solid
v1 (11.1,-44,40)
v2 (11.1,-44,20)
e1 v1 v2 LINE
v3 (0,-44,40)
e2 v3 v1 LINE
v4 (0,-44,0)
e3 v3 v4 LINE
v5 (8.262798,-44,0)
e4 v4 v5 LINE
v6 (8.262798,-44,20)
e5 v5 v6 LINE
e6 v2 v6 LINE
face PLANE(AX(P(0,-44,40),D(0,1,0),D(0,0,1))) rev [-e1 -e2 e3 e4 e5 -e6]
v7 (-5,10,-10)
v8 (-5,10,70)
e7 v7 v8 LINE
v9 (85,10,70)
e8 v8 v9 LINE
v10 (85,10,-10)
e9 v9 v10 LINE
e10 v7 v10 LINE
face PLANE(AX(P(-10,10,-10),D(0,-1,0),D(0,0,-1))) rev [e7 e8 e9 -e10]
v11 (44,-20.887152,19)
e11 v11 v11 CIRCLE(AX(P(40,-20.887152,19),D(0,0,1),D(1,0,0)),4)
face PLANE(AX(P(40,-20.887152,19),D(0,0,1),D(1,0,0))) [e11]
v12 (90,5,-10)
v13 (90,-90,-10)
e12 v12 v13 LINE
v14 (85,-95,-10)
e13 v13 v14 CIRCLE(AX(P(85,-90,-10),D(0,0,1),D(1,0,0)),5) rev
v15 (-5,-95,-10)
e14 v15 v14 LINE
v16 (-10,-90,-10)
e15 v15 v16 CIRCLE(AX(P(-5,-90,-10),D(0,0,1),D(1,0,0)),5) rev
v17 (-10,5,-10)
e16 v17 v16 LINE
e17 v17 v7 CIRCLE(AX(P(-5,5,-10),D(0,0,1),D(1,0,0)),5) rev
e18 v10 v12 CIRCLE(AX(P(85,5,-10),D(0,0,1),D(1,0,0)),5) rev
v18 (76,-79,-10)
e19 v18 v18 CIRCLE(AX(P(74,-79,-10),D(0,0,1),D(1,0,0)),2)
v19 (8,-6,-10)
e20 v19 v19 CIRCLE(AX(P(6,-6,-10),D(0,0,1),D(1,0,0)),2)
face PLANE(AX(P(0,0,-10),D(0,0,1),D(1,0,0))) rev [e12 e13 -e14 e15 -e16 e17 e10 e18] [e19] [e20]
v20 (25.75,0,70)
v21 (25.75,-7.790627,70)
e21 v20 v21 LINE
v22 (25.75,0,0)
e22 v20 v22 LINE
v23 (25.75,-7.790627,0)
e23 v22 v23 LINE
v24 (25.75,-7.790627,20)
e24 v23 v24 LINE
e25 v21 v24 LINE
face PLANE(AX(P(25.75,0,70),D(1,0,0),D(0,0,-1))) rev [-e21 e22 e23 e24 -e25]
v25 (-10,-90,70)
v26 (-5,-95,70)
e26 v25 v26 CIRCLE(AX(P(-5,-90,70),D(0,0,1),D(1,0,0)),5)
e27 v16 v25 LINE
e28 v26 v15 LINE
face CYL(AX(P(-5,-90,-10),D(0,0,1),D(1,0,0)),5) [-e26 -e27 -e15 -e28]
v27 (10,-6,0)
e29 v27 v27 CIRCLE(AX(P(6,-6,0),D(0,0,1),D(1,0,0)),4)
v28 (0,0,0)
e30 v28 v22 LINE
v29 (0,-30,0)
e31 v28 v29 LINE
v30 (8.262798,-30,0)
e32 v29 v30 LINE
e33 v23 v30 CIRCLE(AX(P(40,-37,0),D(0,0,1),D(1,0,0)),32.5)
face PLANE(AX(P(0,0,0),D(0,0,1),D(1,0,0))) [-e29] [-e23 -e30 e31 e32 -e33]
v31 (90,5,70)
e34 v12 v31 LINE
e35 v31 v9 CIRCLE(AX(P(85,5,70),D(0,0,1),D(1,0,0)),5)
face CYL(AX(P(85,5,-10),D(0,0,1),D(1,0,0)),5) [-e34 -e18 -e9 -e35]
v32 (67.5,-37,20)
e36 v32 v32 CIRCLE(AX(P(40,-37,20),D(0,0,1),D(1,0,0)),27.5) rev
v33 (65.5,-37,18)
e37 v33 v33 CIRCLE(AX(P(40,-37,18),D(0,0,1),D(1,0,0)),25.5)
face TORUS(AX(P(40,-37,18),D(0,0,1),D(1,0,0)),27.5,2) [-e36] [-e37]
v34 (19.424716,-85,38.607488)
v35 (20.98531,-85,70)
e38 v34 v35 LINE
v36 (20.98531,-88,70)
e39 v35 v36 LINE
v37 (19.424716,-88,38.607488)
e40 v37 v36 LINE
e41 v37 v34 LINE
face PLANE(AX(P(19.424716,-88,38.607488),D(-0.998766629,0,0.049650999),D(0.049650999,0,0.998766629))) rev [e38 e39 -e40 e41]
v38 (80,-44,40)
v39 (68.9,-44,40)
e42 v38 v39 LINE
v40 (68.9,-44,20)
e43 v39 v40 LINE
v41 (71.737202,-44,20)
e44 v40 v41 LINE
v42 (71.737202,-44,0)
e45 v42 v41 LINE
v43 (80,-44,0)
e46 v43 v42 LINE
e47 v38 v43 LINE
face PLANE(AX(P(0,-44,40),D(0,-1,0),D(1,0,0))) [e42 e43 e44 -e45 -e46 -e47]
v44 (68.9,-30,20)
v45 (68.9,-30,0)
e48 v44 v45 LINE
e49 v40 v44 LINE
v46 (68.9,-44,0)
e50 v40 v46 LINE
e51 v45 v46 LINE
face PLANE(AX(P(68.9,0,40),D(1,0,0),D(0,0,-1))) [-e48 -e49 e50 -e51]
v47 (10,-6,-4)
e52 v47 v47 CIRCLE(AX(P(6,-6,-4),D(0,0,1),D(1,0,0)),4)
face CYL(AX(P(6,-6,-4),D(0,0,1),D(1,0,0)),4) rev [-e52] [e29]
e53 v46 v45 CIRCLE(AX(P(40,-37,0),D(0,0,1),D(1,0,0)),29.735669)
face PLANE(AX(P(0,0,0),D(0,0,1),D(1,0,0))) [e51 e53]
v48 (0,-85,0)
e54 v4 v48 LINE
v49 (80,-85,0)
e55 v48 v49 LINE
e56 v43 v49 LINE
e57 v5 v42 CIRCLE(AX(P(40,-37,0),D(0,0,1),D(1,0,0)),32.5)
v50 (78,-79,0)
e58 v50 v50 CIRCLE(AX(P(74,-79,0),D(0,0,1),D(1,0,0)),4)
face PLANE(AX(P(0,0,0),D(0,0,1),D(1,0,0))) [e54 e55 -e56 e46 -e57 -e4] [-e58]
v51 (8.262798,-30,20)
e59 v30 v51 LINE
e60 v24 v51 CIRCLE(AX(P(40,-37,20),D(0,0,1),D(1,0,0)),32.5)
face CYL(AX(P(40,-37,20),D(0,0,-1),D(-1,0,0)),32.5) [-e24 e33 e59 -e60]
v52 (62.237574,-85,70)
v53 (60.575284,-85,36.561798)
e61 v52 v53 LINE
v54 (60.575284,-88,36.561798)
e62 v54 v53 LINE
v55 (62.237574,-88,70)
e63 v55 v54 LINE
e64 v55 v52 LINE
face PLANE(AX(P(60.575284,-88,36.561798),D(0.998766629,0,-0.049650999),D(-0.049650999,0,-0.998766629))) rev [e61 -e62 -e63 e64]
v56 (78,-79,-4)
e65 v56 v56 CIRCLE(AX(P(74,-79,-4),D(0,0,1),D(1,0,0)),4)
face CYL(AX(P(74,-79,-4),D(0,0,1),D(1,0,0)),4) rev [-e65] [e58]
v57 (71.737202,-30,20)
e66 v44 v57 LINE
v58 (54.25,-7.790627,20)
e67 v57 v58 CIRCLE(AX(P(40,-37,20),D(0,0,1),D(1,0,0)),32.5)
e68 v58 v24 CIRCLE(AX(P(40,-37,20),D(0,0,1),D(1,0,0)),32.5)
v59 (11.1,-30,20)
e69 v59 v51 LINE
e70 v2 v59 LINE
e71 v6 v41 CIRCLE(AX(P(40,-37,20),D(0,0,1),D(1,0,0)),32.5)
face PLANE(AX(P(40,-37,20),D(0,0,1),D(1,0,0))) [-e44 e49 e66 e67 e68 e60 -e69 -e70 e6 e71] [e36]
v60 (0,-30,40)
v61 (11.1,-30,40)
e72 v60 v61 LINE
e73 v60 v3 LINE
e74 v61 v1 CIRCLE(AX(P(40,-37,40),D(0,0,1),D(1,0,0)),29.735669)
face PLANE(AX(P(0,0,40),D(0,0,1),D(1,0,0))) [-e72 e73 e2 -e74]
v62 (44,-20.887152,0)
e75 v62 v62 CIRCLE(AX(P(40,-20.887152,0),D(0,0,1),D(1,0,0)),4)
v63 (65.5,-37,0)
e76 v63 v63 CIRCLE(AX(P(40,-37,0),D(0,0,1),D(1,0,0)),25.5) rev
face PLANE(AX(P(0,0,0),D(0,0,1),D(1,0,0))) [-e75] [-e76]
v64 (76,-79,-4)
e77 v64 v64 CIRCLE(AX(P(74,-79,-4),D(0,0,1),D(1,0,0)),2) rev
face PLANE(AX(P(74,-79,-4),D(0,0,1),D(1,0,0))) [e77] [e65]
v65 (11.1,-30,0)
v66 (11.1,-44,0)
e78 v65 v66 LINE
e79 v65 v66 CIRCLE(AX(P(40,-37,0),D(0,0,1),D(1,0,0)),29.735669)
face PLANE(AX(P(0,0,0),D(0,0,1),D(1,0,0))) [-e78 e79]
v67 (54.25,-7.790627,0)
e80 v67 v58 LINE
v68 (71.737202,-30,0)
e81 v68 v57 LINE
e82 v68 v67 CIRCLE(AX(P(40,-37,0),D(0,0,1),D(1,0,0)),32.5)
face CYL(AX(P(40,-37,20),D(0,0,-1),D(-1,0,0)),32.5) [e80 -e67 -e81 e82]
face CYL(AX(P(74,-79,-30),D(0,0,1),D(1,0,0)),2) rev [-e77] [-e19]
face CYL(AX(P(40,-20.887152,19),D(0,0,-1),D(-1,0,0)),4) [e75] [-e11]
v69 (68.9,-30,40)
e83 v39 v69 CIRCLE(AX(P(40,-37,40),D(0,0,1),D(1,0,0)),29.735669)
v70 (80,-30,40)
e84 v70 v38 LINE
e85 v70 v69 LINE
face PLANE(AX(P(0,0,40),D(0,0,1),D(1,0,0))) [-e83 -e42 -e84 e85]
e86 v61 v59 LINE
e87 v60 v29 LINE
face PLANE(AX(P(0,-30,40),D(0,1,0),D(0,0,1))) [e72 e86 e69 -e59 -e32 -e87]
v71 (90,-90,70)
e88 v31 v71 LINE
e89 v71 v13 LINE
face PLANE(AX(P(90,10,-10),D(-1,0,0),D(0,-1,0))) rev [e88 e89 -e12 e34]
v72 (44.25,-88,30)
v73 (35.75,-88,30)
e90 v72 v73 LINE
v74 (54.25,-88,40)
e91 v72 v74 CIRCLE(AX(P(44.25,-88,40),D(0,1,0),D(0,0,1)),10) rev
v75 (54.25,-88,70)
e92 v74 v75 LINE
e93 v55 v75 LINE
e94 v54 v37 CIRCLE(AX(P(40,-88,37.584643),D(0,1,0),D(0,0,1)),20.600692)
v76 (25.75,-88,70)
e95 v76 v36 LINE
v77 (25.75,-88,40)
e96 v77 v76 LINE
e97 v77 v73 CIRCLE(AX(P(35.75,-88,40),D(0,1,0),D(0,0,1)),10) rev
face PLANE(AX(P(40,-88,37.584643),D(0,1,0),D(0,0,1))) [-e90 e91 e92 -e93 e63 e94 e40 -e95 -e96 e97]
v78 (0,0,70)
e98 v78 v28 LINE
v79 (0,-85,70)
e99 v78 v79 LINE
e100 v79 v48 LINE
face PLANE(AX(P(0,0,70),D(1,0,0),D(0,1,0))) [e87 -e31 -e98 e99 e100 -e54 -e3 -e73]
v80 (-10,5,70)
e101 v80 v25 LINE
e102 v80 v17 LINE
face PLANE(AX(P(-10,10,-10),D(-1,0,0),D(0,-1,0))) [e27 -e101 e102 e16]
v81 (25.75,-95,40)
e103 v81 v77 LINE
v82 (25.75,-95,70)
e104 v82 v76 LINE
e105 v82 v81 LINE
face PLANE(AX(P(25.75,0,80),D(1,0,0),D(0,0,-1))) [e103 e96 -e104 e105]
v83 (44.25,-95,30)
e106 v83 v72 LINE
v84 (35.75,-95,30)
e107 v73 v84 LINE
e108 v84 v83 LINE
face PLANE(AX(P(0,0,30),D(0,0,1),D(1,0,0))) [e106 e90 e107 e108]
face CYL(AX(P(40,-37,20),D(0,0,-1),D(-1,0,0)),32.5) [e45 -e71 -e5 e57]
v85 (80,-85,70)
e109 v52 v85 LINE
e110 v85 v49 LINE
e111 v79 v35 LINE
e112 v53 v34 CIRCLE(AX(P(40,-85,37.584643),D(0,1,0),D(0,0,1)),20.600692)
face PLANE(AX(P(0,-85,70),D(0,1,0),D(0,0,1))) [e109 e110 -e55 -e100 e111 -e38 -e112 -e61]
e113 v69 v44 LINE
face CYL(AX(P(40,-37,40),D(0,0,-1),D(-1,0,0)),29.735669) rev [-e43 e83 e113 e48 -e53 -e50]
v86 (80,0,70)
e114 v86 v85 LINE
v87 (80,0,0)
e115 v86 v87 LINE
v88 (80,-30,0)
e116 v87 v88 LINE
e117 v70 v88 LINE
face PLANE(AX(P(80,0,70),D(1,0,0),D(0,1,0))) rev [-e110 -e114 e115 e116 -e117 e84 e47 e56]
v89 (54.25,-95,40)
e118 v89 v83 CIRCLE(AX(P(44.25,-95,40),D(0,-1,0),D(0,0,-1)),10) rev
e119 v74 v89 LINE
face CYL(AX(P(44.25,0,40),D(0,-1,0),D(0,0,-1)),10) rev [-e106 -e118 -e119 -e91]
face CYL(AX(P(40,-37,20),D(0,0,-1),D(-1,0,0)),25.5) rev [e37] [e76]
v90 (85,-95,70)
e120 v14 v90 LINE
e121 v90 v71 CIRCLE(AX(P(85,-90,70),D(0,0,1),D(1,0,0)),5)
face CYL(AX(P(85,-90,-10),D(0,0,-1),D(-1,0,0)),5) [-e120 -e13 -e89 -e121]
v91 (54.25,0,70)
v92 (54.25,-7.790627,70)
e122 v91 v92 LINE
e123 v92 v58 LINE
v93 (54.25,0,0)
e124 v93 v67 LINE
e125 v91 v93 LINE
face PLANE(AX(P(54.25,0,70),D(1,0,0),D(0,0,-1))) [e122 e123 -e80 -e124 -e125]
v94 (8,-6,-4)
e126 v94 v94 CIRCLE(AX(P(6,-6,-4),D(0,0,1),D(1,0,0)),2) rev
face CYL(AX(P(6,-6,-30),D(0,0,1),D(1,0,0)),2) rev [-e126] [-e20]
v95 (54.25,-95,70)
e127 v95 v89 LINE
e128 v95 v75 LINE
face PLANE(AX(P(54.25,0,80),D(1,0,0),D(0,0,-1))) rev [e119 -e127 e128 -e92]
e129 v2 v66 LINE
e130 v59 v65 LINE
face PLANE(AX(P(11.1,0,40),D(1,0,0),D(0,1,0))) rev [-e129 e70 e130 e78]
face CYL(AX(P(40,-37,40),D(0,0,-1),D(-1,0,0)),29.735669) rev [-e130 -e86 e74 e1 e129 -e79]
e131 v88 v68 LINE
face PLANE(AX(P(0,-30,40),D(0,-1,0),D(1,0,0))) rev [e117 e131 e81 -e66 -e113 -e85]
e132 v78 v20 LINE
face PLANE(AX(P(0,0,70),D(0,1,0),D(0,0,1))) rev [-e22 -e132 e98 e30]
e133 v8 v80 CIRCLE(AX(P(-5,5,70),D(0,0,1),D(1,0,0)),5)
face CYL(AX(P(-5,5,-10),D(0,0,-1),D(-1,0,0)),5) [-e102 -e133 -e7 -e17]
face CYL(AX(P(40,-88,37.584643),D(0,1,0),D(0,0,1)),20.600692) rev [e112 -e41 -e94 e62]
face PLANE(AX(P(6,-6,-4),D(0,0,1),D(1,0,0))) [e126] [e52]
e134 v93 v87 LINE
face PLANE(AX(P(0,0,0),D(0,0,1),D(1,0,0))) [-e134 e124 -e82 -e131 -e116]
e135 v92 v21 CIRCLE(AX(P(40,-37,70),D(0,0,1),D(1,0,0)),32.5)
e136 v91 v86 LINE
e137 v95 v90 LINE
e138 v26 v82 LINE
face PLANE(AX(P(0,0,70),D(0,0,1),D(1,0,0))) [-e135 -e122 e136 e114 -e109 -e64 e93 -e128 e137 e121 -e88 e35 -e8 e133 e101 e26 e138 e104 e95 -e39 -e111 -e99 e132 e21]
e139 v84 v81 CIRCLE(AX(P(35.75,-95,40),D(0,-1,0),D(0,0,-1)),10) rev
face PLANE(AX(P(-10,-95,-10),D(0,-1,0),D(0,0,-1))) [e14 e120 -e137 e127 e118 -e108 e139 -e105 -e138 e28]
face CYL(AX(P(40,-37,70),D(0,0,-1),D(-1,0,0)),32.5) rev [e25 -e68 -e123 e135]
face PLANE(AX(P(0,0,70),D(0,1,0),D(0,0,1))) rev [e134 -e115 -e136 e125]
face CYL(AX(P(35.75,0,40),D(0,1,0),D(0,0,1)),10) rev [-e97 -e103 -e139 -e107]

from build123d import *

# Parameters (mm, degrees)
SKETCH1_W            = 100
SKETCH1_H            = 105
BOSS_EXTRUDE1_DEPTH  = 10
SKETCH1_3_W          = 100
SKETCH1_3_H          = 105
SKETCH1_3_W_2        = 80
SKETCH1_3_H_2        = 85
BOSS_EXTRUDE2_DEPTH  = 70
SKETCH1_6_W          = 28.5
SKETCH1_6_H          = 10
CUT_EXTRUDE1_DEPTH   = 80
SKETCH1_7_W          = 28.5
SKETCH1_7_H          = 10
BOSS_EXTRUDE4_DEPTH  = 30
SKETCH1_8_R          = 2
CUT_EXTRUDE2_DEPTH   = 30
SKETCH1_9_R          = 4
CUT_EXTRUDE3_DEPTH   = 4
SKETCH1_11_R         = 32.5
SKETCH1_11_R_2       = 25.5
BOSS_EXTRUDE6_DEPTH  = 20
FILLET1_R            = 10
SKETCH1_12_R         = 4
BOSS_EXTRUDE7_DEPTH  = 19
BOSS_EXTRUDE13_DEPTH = 70
BOSS_EXTRUDE17_DEPTH = 40
CUT_EXTRUDE4_DEPTH   = 40
CUT_EXTRUDE5_DEPTH   = 3
FILLET2_R            = 5
FILLET3_R            = 2


with BuildPart() as part:
    # Sketch1 → Boss-Extrude1 (new body)
    with BuildSketch(Plane.XY):
        with Locations((40, -42.5)):
            Rectangle(SKETCH1_W, SKETCH1_H)
    extrude(amount=-BOSS_EXTRUDE1_DEPTH)

    # Sketch1<3> → Boss-Extrude2 (add)
    with BuildSketch(Plane.XY):
        with Locations((40, -42.5)):
            Rectangle(SKETCH1_3_W, SKETCH1_3_H)
        with Locations((40, -42.5)):
            Rectangle(SKETCH1_3_W_2, SKETCH1_3_H_2, mode=Mode.SUBTRACT)
    extrude(amount=BOSS_EXTRUDE2_DEPTH)

    # Sketch1<6> → Cut-Extrude1 (cut)
    with BuildSketch(Plane.XY):
        with Locations((40, -90)):
            Rectangle(SKETCH1_6_W, SKETCH1_6_H)
    extrude(amount=CUT_EXTRUDE1_DEPTH, mode=Mode.SUBTRACT)

    # Sketch1<7> → Boss-Extrude4 (add)
    with BuildSketch(Plane.XY):
        with Locations((40, -90)):
            Rectangle(SKETCH1_7_W, SKETCH1_7_H)
    extrude(amount=BOSS_EXTRUDE4_DEPTH)

    # Sketch1<8> → Cut-Extrude2 (cut)
    with BuildSketch(Plane.XY):
        with Locations((6, -6)):
            Circle(SKETCH1_8_R)
        with Locations((74, -79)):
            Circle(SKETCH1_8_R)
    extrude(amount=-CUT_EXTRUDE2_DEPTH, mode=Mode.SUBTRACT)

    # Sketch1<9> → Cut-Extrude3 (cut)
    with BuildSketch(Plane.XY):
        with Locations((6, -6)):
            Circle(SKETCH1_9_R)
        with Locations((74, -79)):
            Circle(SKETCH1_9_R)
    extrude(amount=-CUT_EXTRUDE3_DEPTH, mode=Mode.SUBTRACT)

    # Sketch1<11> → Boss-Extrude6 (add)
    with BuildSketch(Plane.XY):
        with Locations((40, -37)):
            Circle(SKETCH1_11_R)
        with Locations((40, -37)):
            Circle(SKETCH1_11_R_2, mode=Mode.SUBTRACT)
    extrude(amount=BOSS_EXTRUDE6_DEPTH)

    # Fillet1
    fillet1_edges = [part.edges().sort_by_distance(p)[0] for p in [
        (25.75, -90, 30),
        (54.25, -90, 30),
    ]]
    fillet(fillet1_edges, radius=FILLET1_R)

    # Sketch1<12> → Boss-Extrude7 (add)
    with BuildSketch(Plane.XY):
        with Locations((40, -20.887152182)):
            Circle(SKETCH1_12_R)
    extrude(amount=BOSS_EXTRUDE7_DEPTH)

    # Sketch1<18> → Boss-Extrude13 (add)
    with BuildSketch(Plane.XY):
        with BuildLine():
            Line((54.25, -7.790626504), (54.25, 0))
            Line((54.25, 0), (25.75, 0))
            Line((25.75, 0), (25.75, -7.790626504))
            ThreePointArc((25.75, -7.790626504), (40, -4.5), (54.25, -7.790626504))
        make_face()
    extrude(amount=BOSS_EXTRUDE13_DEPTH)

    # Sketch1<24> → Boss-Extrude17 (add)
    with BuildSketch(Plane.XY):
        with BuildLine():
            Line((80, -44), (80, -30))
            Line((80, -30), (68.9, -30))
            ThreePointArc((68.9, -30), (69.735668817, -37), (68.9, -44))
            Line((68.9, -44), (80, -44))
        make_face()
        with BuildLine():
            Line((0, -44), (11.1, -44))
            ThreePointArc((11.1, -44), (10.264331183, -37), (11.1, -30))
            Line((11.1, -30), (0, -30))
            Line((0, -30), (0, -44))
        make_face()
    extrude(amount=BOSS_EXTRUDE17_DEPTH)

    # Sketch1<25> → Cut-Extrude4 (cut)
    with BuildSketch(Plane.XY):
        with BuildLine():
            ThreePointArc((68.9, -44), (69.735668817, -37), (68.9, -30))
            Line((68.9, -30), (68.9, -44))
        make_face()
        with BuildLine():
            Line((11.1, -44), (11.1, -30))
            ThreePointArc((11.1, -30), (10.264331183, -37), (11.1, -44))
        make_face()
    extrude(amount=CUT_EXTRUDE4_DEPTH, mode=Mode.SUBTRACT)

    # Sketch2 → Cut-Extrude5 (cut)
    with BuildSketch(Plane(origin=(0, -85, 0), x_dir=(1, 0, 0), z_dir=(0, 1, 0))):
        with BuildLine():
            Line((60.575284083, -36.561798125), (62.82181371, -81.752405975))
            ThreePointArc((62.82181371, -81.752405975), (43.269374583, -103.350535014), (21.671245545, -83.798095887))
            Line((21.671245545, -83.798095887), (19.424715917, -38.607488037))
            ThreePointArc((19.424715917, -38.607488037), (38.977155044, -17.009358998), (60.575284083, -36.561798125))
        make_face()
    extrude(amount=-CUT_EXTRUDE5_DEPTH, mode=Mode.SUBTRACT)

    # Fillet2
    fillet2_edges = [part.edges().sort_by_distance(p)[0] for p in [
        (90, -95, 30),
        (90, 10, 30),
        (-10, 10, 30),
        (-10, -95, 30),
    ]]
    fillet(fillet2_edges, radius=FILLET2_R)

    # Fillet3
    fillet3_edges = [part.edges().sort_by_distance(p)[0] for p in [
        (14.5, -37, 20),
    ]]
    fillet(fillet3_edges, radius=FILLET3_R)


solid = part.part
